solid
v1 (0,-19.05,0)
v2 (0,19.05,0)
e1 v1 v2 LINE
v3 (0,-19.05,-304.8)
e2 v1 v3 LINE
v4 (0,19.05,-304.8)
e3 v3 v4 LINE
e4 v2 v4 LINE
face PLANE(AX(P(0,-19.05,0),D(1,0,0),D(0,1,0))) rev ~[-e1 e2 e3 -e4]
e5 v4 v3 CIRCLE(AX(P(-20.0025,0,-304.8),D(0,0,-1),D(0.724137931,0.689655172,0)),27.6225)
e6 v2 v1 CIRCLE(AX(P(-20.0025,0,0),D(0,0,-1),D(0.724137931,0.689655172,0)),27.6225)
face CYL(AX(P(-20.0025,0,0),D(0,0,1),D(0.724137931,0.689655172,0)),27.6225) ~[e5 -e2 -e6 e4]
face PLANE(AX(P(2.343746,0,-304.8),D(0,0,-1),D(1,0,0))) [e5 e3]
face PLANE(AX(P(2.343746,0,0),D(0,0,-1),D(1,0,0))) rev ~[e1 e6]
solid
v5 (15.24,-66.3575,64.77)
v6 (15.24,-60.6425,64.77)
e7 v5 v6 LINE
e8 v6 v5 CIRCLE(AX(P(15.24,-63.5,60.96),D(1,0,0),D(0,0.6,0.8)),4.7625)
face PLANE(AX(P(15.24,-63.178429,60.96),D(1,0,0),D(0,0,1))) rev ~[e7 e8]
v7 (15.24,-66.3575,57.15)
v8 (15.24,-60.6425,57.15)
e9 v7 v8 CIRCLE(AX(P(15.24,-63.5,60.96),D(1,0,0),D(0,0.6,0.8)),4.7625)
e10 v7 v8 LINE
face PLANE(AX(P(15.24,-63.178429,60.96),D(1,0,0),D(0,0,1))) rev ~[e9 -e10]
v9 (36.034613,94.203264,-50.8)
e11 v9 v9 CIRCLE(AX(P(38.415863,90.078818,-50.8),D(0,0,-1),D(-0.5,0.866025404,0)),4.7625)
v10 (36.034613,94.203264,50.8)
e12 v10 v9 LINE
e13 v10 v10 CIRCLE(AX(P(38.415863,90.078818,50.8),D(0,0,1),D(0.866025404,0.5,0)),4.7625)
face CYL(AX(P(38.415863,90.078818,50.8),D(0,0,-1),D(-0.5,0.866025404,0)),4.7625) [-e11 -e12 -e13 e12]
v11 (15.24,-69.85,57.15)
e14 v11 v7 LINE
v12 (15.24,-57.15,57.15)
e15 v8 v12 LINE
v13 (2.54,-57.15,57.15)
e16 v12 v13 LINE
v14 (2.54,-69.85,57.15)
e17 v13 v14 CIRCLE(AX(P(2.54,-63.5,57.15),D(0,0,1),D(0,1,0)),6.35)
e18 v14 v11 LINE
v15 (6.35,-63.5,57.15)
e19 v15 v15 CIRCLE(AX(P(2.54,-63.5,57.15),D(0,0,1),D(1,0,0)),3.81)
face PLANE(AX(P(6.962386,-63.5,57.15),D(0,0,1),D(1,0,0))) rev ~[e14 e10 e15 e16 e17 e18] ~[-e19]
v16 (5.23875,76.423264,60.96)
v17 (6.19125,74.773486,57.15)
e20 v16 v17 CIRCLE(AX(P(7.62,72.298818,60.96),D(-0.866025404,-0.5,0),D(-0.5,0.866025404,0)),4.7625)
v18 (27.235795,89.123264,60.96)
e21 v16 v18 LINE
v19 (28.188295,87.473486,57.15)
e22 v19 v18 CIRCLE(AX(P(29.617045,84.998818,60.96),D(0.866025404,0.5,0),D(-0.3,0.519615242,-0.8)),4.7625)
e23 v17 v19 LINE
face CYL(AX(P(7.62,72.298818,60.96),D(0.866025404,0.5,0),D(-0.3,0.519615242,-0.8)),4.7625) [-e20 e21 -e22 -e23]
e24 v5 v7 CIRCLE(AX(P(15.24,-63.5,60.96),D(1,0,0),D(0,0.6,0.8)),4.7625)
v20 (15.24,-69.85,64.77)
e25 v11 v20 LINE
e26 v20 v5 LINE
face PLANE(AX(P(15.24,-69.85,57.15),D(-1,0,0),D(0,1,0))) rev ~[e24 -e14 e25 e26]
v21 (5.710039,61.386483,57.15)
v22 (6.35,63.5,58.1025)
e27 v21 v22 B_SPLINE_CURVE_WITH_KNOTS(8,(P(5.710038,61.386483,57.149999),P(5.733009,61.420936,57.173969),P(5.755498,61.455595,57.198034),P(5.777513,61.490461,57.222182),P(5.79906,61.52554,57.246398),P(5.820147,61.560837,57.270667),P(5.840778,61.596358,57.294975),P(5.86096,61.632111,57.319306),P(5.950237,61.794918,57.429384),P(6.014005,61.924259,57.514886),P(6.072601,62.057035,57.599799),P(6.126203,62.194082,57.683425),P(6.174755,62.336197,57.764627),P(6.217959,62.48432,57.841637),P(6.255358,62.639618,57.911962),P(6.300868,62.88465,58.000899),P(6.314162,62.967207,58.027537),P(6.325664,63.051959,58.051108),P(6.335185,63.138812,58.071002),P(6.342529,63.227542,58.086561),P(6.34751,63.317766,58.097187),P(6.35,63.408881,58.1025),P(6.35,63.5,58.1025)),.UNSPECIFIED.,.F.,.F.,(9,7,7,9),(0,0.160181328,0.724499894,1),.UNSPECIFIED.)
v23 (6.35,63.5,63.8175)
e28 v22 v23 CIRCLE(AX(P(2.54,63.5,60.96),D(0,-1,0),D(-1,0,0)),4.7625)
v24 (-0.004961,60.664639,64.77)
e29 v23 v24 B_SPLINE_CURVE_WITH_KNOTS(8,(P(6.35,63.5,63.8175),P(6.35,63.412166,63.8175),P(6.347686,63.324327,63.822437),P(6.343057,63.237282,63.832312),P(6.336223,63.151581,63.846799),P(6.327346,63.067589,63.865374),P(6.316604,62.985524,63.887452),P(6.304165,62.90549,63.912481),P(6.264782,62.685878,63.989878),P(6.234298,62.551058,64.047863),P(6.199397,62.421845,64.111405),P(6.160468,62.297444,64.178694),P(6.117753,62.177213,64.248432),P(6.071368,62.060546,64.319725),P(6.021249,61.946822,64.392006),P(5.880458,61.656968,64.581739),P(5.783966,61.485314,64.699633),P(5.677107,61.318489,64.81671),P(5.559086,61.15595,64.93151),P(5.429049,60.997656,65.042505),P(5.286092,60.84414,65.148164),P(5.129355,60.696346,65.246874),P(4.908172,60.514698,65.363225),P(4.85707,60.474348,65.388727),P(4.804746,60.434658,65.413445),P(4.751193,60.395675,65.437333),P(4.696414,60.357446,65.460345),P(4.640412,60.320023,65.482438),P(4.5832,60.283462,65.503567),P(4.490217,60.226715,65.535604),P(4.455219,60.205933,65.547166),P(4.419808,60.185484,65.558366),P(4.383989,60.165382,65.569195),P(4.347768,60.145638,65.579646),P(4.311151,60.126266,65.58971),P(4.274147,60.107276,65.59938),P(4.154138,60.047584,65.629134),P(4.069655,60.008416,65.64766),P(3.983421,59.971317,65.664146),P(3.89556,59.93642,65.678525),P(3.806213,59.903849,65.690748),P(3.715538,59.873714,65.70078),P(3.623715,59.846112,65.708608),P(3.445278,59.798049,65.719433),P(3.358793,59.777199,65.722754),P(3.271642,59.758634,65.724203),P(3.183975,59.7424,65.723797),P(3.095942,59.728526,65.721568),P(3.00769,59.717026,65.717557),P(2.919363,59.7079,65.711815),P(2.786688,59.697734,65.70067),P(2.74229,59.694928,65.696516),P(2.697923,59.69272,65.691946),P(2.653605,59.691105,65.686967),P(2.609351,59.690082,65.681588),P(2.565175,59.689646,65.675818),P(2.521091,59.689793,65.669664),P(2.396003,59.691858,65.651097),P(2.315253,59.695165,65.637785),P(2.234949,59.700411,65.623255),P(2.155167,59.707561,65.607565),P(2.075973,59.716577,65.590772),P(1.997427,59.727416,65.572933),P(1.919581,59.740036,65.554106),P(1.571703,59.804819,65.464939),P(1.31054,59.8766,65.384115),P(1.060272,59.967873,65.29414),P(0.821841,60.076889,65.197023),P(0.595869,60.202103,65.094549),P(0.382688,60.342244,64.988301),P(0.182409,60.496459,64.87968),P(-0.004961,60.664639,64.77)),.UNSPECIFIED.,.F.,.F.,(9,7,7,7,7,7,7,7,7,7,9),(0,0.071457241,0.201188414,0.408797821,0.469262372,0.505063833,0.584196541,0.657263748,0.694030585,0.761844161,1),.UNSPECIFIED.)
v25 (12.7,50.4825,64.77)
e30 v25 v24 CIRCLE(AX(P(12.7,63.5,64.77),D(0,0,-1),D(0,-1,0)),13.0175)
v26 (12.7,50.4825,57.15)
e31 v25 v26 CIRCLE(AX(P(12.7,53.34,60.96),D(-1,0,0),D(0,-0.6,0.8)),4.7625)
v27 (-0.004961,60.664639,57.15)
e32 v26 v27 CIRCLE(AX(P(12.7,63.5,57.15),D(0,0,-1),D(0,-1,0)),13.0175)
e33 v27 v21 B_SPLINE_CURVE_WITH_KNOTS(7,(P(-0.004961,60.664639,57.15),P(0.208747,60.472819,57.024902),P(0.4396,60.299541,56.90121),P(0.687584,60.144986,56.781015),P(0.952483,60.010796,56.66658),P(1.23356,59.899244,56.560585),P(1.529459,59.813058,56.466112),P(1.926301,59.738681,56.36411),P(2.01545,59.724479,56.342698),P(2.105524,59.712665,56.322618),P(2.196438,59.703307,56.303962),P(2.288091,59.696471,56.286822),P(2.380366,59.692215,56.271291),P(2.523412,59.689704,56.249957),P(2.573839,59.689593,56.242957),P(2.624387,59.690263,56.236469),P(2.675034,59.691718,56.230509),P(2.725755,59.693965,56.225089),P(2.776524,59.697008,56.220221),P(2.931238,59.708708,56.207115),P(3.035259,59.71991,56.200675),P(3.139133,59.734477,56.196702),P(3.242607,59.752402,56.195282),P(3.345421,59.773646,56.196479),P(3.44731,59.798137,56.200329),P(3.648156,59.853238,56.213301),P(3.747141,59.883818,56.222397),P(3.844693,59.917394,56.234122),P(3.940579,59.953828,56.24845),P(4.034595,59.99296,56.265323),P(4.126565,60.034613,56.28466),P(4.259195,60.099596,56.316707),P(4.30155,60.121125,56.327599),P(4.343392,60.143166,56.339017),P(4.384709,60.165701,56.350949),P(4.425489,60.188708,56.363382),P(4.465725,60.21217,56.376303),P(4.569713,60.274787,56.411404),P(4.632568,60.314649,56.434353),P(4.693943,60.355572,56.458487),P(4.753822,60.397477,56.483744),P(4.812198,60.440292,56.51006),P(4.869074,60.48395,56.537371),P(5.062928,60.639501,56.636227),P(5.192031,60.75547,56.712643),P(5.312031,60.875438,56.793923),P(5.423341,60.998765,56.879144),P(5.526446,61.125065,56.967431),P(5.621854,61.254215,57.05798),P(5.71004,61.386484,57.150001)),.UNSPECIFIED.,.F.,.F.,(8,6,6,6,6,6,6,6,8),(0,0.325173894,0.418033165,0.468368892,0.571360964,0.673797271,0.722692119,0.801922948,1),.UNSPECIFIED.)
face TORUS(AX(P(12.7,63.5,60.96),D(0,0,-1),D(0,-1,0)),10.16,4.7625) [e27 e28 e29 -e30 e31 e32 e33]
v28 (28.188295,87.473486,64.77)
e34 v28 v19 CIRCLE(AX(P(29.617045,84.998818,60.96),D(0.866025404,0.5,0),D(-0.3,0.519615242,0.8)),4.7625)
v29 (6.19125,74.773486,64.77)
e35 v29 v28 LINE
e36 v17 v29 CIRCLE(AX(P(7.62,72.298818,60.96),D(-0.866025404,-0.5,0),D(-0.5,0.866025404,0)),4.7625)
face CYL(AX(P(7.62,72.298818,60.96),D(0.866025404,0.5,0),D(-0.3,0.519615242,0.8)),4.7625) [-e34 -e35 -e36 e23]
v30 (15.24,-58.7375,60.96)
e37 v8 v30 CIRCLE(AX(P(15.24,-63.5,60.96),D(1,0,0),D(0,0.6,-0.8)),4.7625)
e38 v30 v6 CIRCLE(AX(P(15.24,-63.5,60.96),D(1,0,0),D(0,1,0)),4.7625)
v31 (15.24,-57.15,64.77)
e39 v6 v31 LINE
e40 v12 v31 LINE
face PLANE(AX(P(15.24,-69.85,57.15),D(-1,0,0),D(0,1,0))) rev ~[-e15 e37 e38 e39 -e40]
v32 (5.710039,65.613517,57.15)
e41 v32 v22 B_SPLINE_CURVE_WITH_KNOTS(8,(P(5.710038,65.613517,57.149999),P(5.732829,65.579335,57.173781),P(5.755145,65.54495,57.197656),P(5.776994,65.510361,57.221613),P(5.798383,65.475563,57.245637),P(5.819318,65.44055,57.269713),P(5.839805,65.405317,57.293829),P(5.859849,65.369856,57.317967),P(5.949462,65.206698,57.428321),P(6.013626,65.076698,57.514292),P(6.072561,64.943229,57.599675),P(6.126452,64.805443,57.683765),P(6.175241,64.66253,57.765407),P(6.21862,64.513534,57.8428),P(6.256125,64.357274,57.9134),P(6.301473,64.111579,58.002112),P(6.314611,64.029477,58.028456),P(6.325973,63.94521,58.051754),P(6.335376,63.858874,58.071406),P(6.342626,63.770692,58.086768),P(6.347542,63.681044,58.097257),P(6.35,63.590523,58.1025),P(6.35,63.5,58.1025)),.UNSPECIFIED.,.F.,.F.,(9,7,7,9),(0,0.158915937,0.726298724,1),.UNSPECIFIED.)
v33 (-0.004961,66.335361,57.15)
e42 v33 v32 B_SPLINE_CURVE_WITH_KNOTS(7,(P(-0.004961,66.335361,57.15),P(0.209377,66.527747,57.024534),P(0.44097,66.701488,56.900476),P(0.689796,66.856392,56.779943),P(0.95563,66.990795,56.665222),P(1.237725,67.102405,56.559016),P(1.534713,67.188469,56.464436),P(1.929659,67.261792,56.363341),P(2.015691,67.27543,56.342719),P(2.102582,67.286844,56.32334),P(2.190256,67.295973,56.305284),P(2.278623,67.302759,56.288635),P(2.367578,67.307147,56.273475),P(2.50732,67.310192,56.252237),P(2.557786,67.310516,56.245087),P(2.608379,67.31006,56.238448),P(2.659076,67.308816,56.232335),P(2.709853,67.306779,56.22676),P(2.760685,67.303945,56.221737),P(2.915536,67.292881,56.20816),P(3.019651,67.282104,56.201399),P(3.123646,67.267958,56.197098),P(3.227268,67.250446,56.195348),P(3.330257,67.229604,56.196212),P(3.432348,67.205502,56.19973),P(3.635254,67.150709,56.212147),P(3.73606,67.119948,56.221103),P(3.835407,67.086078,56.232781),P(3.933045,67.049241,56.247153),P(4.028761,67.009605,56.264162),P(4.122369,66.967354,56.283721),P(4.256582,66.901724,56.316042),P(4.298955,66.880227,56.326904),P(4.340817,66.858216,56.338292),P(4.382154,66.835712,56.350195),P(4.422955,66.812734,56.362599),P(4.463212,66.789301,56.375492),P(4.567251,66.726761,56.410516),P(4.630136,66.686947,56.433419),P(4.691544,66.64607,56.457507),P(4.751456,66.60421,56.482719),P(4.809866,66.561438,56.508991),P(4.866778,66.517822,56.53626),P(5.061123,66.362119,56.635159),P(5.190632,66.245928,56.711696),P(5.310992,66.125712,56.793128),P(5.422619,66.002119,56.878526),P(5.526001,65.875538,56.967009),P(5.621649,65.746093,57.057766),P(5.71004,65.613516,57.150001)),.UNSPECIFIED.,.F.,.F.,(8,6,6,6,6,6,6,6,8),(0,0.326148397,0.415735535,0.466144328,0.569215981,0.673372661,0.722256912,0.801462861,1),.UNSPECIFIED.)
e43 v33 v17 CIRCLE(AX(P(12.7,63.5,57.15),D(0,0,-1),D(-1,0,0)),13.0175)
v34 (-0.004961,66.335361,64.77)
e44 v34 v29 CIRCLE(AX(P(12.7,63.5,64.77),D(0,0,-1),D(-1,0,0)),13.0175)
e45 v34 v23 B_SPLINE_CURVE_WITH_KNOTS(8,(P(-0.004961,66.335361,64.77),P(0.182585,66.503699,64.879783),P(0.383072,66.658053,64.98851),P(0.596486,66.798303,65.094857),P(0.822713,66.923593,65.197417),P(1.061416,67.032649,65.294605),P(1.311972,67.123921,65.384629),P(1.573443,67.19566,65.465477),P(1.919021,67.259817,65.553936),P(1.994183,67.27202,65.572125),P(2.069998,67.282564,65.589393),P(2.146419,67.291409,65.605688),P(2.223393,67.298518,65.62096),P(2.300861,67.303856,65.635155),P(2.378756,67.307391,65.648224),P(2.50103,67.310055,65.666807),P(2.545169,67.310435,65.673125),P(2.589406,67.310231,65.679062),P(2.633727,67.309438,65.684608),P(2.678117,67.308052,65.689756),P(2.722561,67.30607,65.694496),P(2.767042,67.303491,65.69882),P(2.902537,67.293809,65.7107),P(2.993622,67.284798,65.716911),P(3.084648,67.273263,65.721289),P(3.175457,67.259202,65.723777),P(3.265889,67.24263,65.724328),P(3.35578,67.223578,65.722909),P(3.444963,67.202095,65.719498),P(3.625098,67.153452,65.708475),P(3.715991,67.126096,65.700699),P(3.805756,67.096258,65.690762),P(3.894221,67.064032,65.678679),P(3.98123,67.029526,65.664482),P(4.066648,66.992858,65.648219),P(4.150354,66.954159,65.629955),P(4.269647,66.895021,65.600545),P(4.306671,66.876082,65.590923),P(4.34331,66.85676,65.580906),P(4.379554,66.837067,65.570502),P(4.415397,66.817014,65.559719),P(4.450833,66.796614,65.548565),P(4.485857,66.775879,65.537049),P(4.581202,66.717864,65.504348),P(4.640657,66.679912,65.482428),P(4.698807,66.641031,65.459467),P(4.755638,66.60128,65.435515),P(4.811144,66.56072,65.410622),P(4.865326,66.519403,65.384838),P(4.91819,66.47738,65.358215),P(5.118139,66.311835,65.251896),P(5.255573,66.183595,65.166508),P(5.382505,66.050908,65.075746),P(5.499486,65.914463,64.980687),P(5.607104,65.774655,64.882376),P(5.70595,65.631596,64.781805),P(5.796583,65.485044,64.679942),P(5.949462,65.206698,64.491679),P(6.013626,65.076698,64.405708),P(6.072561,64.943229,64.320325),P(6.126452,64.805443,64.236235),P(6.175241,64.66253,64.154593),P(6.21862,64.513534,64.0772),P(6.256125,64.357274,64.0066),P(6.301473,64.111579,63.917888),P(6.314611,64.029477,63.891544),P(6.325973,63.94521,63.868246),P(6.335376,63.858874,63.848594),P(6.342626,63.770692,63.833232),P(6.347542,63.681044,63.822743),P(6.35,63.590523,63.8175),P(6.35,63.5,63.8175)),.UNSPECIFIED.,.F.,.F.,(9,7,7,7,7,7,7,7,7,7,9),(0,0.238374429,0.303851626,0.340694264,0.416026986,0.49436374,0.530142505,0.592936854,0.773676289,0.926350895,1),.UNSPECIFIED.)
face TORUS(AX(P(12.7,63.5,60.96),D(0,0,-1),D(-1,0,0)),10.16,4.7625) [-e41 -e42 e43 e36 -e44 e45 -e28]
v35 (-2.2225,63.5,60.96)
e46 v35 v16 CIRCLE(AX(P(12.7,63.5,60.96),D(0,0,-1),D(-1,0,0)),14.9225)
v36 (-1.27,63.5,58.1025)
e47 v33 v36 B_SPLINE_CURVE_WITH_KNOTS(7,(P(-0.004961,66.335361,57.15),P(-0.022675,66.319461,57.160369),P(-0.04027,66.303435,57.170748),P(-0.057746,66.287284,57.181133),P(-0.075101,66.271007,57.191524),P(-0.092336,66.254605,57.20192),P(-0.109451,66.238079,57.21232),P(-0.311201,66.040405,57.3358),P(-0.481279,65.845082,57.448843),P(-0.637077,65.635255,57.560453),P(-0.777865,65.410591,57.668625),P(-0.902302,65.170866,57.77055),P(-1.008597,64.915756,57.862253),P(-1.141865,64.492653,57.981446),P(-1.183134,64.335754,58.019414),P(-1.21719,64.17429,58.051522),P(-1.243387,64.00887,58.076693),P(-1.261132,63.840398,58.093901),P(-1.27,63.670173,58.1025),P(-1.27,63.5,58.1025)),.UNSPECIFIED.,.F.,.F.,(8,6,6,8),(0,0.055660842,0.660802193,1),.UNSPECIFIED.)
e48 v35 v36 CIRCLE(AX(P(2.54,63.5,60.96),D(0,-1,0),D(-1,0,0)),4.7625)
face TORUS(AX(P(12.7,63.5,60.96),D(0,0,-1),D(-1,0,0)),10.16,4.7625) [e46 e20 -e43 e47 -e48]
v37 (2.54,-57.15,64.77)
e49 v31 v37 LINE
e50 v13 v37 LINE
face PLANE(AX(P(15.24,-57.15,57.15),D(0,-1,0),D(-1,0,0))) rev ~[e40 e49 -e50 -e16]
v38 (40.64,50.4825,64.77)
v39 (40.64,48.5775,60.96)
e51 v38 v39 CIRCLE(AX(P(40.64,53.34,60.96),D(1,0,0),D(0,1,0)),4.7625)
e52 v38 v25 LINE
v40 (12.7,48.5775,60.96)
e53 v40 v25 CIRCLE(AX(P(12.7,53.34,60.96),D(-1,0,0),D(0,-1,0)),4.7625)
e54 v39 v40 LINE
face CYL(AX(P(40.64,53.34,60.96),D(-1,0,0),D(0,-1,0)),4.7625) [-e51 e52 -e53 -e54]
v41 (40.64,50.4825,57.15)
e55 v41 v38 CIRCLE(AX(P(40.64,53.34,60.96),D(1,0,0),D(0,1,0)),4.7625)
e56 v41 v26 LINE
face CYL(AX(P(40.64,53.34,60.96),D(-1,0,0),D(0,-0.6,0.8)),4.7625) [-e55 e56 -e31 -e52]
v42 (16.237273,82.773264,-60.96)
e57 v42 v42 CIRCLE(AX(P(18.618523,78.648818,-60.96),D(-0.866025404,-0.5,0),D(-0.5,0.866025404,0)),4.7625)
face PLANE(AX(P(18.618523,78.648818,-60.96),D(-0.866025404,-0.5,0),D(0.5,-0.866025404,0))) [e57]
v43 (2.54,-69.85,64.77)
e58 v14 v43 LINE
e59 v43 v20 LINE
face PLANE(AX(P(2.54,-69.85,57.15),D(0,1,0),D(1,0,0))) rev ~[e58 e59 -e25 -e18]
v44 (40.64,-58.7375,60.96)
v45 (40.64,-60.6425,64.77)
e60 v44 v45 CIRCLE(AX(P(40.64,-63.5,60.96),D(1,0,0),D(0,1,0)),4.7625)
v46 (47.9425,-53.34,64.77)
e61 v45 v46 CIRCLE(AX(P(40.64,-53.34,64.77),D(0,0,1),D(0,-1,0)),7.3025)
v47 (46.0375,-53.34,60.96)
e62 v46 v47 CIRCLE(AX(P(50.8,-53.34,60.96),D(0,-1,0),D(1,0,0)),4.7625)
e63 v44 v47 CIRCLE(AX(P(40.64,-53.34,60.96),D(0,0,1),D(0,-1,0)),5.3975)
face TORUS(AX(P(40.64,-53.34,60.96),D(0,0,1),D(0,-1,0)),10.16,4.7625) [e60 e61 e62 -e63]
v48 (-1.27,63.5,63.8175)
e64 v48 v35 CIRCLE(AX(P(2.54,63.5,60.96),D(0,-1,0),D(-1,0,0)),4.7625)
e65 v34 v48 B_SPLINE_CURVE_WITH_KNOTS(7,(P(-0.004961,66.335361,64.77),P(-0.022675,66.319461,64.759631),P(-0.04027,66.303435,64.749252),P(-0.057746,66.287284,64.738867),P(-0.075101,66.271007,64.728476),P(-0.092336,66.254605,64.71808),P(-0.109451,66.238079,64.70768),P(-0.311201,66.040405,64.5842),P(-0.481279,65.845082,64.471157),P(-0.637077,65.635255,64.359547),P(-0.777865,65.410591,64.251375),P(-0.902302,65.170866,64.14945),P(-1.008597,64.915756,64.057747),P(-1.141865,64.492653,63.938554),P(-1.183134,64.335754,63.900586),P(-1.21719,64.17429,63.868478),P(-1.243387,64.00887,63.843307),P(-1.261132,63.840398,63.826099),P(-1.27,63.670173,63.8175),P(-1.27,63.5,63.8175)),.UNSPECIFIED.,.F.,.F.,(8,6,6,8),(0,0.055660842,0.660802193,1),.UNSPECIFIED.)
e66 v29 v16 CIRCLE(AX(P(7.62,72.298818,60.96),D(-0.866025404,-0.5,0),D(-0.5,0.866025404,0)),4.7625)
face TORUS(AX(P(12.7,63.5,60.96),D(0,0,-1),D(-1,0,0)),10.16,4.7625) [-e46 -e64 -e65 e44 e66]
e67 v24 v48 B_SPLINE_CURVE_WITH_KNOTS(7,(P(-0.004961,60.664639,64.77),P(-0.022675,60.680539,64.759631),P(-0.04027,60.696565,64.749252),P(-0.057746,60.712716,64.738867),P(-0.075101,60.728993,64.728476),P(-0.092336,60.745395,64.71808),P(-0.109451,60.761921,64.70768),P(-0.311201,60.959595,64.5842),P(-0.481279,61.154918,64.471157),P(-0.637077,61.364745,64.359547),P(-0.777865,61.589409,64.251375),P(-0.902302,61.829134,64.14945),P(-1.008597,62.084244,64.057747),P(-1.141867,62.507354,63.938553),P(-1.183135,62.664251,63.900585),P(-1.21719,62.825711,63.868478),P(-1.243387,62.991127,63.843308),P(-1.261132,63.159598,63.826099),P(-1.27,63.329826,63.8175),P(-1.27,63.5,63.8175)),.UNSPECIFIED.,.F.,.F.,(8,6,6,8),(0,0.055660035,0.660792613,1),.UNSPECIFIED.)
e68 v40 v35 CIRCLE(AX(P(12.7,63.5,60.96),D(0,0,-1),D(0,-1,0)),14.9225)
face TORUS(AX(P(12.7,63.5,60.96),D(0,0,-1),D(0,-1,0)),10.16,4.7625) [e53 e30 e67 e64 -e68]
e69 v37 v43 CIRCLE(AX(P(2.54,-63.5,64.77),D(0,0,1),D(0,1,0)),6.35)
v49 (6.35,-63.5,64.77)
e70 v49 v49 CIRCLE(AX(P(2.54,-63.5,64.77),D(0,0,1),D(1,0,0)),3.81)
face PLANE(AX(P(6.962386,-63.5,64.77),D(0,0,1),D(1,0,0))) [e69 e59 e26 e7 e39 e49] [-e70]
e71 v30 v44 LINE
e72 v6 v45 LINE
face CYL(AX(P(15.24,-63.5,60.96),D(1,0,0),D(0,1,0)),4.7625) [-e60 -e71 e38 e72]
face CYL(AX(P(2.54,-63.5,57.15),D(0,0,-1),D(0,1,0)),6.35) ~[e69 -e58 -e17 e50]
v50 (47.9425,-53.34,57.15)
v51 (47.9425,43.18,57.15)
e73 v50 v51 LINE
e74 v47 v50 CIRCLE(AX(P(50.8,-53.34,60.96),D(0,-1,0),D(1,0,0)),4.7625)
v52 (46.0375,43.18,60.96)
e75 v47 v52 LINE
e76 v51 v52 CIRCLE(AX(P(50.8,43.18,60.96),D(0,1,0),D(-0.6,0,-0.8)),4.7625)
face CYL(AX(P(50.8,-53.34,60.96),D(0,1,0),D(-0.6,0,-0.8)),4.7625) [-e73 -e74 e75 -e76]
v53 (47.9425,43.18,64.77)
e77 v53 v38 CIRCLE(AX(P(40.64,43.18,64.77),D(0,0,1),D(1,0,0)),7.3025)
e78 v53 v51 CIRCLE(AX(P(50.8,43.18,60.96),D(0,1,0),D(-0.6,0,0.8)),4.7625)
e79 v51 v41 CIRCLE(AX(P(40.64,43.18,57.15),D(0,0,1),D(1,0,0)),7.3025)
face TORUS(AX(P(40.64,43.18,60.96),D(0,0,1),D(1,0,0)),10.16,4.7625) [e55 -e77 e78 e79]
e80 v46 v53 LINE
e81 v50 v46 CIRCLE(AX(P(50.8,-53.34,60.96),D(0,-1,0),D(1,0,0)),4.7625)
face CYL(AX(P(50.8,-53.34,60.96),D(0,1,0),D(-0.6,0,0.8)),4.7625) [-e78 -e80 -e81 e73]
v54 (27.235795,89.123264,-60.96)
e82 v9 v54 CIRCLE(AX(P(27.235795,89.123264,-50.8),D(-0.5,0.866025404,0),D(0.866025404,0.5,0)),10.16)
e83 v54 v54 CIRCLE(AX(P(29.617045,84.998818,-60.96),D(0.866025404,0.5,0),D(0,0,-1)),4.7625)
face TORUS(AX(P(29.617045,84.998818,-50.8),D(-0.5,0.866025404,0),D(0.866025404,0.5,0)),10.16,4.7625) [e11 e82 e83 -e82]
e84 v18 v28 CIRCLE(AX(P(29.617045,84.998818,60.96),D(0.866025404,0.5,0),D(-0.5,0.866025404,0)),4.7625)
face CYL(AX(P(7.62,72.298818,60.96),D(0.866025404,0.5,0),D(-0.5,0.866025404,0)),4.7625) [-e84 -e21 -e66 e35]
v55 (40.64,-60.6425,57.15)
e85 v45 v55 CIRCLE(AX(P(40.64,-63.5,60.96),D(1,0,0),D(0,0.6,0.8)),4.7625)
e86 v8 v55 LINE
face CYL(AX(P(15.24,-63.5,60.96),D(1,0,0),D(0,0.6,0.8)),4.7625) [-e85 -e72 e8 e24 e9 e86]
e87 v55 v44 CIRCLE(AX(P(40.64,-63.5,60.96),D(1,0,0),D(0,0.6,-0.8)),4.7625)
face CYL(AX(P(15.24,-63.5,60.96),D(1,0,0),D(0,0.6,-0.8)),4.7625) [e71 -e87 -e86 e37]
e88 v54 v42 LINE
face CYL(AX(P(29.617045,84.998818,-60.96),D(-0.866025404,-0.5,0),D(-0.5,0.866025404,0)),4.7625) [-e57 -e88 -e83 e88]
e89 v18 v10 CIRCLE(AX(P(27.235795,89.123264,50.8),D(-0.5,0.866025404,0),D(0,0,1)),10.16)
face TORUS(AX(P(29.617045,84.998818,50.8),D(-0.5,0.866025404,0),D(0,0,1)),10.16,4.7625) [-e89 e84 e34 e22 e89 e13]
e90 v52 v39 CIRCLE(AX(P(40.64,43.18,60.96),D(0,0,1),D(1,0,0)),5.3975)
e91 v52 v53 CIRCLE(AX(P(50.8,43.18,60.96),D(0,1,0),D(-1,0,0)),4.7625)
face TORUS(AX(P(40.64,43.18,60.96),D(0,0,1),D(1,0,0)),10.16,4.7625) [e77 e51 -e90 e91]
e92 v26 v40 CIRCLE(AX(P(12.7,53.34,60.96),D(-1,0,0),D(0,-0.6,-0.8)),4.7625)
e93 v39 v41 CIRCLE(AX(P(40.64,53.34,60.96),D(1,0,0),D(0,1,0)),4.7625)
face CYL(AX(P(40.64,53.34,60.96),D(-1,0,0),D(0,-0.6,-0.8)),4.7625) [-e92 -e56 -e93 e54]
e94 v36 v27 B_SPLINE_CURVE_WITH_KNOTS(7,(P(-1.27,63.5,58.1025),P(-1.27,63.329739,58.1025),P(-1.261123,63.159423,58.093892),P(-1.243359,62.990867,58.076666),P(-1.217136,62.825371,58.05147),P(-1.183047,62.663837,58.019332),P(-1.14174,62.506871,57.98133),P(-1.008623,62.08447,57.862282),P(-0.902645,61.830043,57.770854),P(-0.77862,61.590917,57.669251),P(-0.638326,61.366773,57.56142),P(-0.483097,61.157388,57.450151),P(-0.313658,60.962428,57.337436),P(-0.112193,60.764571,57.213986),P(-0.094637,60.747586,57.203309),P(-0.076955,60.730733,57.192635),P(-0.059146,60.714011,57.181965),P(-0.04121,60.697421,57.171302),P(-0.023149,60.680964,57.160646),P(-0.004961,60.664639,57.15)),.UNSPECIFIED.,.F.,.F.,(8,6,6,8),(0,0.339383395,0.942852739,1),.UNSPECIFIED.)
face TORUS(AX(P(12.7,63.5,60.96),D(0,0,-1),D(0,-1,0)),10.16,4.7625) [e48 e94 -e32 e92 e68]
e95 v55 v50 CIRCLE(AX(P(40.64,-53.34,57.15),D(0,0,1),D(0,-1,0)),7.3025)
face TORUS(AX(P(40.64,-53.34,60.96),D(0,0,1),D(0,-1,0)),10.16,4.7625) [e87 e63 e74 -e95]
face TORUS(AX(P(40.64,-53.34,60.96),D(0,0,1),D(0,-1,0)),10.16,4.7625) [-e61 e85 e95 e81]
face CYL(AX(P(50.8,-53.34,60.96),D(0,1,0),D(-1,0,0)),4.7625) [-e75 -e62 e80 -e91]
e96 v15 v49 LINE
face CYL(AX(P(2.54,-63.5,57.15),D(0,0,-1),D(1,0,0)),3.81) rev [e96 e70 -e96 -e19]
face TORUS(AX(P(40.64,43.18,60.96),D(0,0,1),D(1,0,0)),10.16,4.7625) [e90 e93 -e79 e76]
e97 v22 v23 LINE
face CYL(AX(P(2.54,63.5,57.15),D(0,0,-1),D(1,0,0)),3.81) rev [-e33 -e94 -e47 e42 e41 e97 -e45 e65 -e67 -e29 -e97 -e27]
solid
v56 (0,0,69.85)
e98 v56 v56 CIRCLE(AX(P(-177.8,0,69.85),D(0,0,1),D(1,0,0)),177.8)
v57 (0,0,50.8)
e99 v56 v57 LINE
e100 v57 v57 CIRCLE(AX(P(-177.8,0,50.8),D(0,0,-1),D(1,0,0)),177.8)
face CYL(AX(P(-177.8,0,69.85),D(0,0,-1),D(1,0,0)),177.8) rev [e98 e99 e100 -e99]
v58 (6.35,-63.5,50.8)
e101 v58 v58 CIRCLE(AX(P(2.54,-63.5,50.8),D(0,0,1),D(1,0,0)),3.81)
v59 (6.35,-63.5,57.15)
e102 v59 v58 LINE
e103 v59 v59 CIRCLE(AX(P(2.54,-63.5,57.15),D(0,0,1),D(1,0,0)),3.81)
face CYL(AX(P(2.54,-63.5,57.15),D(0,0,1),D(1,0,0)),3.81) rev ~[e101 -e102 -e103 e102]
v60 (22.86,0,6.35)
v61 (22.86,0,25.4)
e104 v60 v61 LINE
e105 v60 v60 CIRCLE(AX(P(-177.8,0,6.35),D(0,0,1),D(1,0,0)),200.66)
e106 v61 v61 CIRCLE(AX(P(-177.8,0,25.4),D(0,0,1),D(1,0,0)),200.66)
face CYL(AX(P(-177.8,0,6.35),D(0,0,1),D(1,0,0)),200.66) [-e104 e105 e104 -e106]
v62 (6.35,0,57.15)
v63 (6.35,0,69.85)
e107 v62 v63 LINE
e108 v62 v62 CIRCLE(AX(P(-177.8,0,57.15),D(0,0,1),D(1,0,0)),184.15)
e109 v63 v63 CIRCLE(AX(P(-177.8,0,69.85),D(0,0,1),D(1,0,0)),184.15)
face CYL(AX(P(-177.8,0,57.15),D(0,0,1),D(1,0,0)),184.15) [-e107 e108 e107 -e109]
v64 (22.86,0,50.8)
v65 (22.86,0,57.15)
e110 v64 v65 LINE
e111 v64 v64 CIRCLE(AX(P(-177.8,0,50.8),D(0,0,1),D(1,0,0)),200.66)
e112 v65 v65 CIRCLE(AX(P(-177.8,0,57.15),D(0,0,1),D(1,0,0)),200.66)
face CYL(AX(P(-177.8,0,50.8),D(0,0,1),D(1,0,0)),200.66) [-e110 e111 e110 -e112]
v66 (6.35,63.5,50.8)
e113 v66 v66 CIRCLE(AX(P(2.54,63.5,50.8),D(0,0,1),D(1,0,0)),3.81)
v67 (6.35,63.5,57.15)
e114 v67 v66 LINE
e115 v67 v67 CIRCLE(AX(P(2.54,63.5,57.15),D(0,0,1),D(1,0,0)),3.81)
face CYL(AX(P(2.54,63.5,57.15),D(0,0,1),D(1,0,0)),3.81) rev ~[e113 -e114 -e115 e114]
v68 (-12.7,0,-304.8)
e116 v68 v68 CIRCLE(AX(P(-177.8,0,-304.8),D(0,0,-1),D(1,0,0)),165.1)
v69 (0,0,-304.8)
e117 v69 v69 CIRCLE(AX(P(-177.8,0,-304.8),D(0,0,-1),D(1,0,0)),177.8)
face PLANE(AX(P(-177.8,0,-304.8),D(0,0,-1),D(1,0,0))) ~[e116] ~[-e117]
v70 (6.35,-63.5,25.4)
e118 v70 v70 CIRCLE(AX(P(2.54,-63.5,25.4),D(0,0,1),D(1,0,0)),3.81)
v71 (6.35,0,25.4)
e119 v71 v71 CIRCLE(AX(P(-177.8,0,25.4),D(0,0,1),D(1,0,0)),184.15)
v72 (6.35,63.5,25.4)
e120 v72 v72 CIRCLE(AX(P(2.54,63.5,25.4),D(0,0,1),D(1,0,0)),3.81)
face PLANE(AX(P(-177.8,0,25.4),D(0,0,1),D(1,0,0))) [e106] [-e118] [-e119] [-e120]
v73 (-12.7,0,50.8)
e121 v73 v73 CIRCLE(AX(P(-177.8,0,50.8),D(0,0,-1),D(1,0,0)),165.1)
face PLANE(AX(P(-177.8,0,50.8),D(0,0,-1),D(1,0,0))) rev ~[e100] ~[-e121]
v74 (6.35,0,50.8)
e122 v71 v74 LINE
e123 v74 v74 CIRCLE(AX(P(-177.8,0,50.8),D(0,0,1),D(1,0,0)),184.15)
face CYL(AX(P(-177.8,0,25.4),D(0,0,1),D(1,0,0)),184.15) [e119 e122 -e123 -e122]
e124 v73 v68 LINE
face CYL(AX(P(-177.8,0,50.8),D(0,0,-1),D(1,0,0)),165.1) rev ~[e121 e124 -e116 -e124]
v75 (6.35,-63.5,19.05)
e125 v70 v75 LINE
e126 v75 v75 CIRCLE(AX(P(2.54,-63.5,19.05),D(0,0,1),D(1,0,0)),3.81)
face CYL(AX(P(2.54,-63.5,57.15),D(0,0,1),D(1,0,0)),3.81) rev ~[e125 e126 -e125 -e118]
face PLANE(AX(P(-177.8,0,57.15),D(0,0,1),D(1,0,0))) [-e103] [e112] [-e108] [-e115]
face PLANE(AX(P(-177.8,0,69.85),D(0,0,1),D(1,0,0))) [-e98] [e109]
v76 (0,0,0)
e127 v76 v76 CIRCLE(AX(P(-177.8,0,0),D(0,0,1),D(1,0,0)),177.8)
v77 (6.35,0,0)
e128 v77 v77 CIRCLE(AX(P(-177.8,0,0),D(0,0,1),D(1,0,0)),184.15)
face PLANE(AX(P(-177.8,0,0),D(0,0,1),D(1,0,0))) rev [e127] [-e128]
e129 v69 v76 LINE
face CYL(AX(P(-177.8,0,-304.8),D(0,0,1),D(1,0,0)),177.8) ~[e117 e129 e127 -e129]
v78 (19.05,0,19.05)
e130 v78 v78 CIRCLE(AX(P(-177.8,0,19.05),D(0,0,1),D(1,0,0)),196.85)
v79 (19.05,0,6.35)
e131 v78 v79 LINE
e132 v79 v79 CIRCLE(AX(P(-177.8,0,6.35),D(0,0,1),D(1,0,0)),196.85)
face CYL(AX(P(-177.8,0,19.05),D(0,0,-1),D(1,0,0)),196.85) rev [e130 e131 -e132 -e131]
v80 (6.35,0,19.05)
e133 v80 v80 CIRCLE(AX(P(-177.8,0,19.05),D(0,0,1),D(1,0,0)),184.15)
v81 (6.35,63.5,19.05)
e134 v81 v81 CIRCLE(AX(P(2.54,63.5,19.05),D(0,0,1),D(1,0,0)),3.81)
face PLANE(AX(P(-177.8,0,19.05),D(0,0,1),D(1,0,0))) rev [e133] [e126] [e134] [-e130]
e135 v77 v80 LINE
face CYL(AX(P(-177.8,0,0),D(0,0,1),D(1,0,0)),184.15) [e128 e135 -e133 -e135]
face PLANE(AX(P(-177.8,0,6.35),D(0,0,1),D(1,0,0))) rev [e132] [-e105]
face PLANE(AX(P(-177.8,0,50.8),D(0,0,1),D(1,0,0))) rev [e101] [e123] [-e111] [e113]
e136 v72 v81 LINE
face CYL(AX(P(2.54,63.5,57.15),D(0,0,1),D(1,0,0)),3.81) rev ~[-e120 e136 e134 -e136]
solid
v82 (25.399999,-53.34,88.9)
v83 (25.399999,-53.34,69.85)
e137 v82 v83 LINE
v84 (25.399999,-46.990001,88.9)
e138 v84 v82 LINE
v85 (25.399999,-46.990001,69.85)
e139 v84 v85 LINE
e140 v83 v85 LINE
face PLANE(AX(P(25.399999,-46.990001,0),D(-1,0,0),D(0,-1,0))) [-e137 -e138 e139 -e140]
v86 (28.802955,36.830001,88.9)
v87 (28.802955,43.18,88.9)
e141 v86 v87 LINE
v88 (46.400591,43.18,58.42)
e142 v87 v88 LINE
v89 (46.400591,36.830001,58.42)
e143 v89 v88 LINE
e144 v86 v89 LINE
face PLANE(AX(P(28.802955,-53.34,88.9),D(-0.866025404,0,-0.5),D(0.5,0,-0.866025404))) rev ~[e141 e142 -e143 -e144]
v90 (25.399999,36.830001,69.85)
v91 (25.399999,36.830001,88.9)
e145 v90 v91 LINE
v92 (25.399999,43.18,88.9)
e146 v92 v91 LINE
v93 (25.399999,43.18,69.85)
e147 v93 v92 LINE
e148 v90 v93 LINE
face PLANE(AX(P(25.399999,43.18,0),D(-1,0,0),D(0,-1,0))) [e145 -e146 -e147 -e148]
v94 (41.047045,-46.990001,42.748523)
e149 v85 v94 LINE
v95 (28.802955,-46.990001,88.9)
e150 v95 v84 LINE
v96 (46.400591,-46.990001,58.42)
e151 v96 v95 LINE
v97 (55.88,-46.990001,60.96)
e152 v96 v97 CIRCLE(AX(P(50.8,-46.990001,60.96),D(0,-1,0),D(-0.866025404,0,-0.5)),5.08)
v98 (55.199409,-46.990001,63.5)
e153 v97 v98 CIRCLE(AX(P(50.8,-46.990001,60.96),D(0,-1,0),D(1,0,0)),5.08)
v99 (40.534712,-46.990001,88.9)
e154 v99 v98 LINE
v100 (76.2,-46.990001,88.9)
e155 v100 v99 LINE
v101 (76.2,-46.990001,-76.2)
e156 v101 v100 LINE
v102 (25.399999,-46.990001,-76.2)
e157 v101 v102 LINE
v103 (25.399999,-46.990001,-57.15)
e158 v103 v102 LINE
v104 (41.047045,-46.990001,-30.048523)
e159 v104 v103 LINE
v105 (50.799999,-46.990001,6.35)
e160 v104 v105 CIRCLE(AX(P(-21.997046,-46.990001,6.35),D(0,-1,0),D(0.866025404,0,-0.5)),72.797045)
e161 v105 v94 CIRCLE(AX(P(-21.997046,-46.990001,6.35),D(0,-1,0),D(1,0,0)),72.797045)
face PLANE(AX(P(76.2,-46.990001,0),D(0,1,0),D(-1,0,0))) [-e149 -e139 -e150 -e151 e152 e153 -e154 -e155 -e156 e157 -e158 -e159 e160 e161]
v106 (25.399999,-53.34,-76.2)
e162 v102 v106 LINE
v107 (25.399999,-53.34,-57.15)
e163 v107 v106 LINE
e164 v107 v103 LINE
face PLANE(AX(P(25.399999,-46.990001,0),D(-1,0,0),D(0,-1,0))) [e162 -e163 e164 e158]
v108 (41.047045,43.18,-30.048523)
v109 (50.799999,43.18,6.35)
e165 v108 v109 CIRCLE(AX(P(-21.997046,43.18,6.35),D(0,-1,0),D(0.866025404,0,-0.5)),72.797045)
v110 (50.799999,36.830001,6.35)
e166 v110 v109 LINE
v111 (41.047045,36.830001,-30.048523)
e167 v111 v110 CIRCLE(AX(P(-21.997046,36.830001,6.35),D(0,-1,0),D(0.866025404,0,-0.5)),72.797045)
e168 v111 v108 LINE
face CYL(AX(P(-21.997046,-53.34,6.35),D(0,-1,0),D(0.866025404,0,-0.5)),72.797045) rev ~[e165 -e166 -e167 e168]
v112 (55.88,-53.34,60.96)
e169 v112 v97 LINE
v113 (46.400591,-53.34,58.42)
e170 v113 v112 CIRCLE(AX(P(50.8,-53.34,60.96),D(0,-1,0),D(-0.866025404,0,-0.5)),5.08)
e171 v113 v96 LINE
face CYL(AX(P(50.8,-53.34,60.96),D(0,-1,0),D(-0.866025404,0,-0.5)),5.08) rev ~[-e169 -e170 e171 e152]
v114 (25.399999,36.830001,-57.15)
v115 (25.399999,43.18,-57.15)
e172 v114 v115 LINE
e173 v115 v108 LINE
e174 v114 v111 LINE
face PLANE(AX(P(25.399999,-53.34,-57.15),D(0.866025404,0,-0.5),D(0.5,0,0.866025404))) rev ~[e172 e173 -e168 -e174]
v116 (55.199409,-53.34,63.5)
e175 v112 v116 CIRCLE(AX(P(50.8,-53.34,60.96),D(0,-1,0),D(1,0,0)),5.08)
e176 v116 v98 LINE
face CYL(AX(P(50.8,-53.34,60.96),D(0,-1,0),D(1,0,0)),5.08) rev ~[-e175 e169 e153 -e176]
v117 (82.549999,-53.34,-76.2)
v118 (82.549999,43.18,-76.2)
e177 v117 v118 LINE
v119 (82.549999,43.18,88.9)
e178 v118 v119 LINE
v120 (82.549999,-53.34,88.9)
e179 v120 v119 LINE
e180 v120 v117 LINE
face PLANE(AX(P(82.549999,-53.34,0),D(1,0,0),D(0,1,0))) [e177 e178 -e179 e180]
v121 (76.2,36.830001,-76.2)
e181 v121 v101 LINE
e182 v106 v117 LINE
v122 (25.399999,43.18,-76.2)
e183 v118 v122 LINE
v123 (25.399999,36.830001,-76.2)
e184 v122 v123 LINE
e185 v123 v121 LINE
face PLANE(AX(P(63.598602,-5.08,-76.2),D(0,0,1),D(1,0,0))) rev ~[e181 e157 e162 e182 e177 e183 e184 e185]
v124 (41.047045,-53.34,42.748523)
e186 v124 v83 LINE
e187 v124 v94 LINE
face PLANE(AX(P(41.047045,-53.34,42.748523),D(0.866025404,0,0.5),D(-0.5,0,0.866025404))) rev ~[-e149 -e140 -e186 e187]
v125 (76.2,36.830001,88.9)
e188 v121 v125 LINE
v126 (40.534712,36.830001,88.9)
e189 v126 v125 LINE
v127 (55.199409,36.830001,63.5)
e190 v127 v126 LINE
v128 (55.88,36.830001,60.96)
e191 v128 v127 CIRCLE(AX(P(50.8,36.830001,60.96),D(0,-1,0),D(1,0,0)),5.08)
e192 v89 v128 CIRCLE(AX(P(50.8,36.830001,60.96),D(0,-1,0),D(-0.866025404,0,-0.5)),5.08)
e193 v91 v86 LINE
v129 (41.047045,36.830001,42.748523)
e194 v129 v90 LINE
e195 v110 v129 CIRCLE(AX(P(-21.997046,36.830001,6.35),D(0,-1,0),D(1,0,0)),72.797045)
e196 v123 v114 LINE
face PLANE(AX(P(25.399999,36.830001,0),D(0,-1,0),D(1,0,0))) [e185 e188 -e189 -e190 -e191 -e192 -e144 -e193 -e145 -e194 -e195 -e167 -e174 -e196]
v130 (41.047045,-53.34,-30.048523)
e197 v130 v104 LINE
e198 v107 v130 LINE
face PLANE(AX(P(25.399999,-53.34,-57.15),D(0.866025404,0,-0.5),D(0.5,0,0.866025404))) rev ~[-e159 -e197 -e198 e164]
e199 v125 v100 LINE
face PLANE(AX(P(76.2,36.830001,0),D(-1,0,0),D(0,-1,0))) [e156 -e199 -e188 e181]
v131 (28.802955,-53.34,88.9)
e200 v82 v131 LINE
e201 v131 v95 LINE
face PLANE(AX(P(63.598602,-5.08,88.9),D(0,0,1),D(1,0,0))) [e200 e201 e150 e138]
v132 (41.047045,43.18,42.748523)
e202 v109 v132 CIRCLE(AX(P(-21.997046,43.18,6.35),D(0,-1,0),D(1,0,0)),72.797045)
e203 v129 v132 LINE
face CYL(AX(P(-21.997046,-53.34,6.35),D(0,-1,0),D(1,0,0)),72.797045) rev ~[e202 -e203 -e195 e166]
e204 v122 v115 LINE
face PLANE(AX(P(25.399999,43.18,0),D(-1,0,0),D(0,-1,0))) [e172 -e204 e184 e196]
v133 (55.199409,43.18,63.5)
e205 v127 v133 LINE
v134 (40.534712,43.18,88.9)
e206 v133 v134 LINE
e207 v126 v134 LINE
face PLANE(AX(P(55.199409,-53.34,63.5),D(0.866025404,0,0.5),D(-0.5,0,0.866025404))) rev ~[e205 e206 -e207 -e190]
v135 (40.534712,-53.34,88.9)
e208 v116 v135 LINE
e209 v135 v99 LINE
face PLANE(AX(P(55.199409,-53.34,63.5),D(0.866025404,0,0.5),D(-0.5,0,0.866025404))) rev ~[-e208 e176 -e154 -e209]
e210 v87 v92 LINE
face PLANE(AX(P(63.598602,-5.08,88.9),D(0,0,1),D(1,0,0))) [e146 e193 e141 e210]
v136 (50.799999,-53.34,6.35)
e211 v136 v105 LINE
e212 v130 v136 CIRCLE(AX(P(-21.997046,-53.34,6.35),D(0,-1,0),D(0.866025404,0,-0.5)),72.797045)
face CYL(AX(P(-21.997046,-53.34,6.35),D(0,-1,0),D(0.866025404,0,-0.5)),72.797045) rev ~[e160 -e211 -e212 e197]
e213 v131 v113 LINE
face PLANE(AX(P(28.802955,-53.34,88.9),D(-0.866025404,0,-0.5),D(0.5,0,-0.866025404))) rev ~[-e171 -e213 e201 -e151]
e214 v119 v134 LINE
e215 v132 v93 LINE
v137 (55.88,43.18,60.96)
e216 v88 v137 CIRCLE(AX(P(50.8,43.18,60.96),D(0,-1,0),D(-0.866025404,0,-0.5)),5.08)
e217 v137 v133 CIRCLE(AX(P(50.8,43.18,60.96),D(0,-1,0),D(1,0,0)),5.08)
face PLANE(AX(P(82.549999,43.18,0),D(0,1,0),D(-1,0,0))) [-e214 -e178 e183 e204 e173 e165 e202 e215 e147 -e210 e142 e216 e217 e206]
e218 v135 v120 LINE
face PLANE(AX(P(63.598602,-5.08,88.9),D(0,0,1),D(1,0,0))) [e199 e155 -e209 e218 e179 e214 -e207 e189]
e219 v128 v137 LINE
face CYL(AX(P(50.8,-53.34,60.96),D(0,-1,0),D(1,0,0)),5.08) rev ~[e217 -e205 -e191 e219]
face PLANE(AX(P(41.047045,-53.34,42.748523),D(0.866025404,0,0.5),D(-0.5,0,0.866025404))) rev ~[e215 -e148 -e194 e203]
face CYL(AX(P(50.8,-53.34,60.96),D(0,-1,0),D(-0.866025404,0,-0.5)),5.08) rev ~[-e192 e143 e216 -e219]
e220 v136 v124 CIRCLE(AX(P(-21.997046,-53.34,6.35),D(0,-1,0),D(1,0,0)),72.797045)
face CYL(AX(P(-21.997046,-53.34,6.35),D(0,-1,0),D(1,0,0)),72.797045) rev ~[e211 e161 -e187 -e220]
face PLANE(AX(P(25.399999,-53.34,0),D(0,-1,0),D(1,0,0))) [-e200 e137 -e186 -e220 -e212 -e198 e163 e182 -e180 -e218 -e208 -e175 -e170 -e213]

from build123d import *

# Parameters (mm, degrees)
F2_R           = 3.81
F3_DEPTH       = 57.151
F4_R           = 3.81
F5_DEPTH       = 7.62
F11_R          = 4.7625
F15_R          = 3.81
F16_DEPTH      = 122.8735001
F16_DEPTH_BACK = 12.701
F20_DEPTH      = 304.8
F22_DEPTH      = 88.9
F22_DEPTH_BACK = 76.2
F24_DEPTH      = 96.52


with BuildPart() as f1:
    # F0 (on Front) → F1 (revolve)
    with BuildSketch(Plane.XZ):
        Polygon((0, 25.4), (0, 0), (6.35, 0), (6.35, 19.05), (19.05, 19.05), (19.05, 6.35), (22.86, 6.35), (22.86, 25.4), (6.35, 25.4), (6.35, 50.8), (22.86, 50.8), (22.86, 57.15), (6.35, 57.15), (6.35, 69.85), (0, 69.85), (0, 50.8), align=None)
    revolve(axis=Axis((-177.8, 0, 29.9224383198), (0, 0, 1)))

    # F2 (on face) → F3 (cut, through all)
    with BuildSketch(Plane.XY.offset(57.15)):
        with Locations((2.54, -63.5)):
            Circle(F2_R)
        with Locations((2.54, 63.5)):
            Circle(F2_R)
    extrude(amount=-F3_DEPTH, mode=Mode.SUBTRACT)

    # F17 (on Front) → F18 (revolve)
    with BuildSketch(Plane.XZ):
        Polygon((0, -304.8), (0, 0), (0, 50.8), (-12.7, 50.8), (-12.7, -304.8), align=None)
    revolve(axis=Axis((-177.8, 0, 69.85), (0, 0, -1)))


with BuildPart() as f5:
    # F4 (on face) → F5 (new body)
    with BuildSketch(Plane.XY.offset(57.15)):
        with BuildLine():
            Line((15.24, -69.85), (15.24, -57.15))
            Line((15.24, -57.15), (2.54, -57.15))
            ThreePointArc((2.54, -57.15), (-3.81, -63.5), (2.54, -69.85))
            Line((2.54, -69.85), (15.24, -69.85))
        make_face()
        with Locations((2.54, -63.5)):
            Circle(F4_R, mode=Mode.SUBTRACT)
    extrude(amount=F5_DEPTH)

    # F10: sweep along a path in F9
    with BuildLine(Plane.XY.offset(60.96)) as f10_path:
        Line((15.24, -63.5), (40.64, -63.5))
        ThreePointArc((40.64, -63.5), (47.8242048969, -60.5242048969), (50.8, -53.34))
        Line((50.8, -53.34), (50.8, 43.18))
        ThreePointArc((50.8, 43.18), (47.8242048969, 50.3642048969), (40.64, 53.34))
        Line((40.64, 53.34), (12.7, 53.34))
        ThreePointArc((12.7, 53.34), (5.5157951031, 56.3157951031), (2.54, 63.5))
        ThreePointArc((2.54, 63.5), (3.9011818976, 68.58), (7.62, 72.2988181024))
        Line((7.62, 72.2988181024), (29.6170452561, 84.9988181024))
    # F6 (on face) → F10 (sweep)
    with BuildSketch(Plane.YZ.offset(15.24)):
        with BuildLine():
            Line((-66.3575, 64.77), (-60.6425, 64.77))
            ThreePointArc((-60.6425, 64.77), (-63.5, 65.7225), (-66.3575, 64.77))
        make_face()
        with BuildLine():
            ThreePointArc((-60.6425, 57.15), (-59.2402905029, 58.8301452514), (-58.7375, 60.96))
            ThreePointArc((-58.7375, 60.96), (-59.2402905029, 63.0898547486), (-60.6425, 64.77))
            Line((-60.6425, 64.77), (-66.3575, 64.77))
            ThreePointArc((-66.3575, 64.77), (-68.2625, 60.96), (-66.3575, 57.15))
            Line((-66.3575, 57.15), (-60.6425, 57.15))
        make_face()
        with BuildLine():
            ThreePointArc((-66.3575, 57.15), (-63.5, 56.1975), (-60.6425, 57.15))
            Line((-60.6425, 57.15), (-66.3575, 57.15))
        make_face()
    sweep(path=f10_path.line)

    # F14: sweep along a path in F13
    with BuildLine(Plane(origin=(-29.4013065702, 50.9245567884, 0), x_dir=(0.8660254038, 0.5, 0), z_dir=(0.5, -0.8660254038, 0))) as f14_path:
        ThreePointArc((68.1485226281, 60.96), (75.3327275249, 57.9842048969), (78.3085226281, 50.8))
        Line((78.3085226281, 50.8), (78.3085226281, -50.8))
        ThreePointArc((78.3085226281, -50.8), (75.3327275249, -57.9842048969), (68.1485226281, -60.96))
        Line((68.1485226281, -60.96), (55.4485226281, -60.96))
    # F11 (on face) → F14 (sweep)
    with BuildSketch(Plane(origin=(59.0183518263, 34.074261314, 0), x_dir=(-0.5, 0.8660254038, 0), z_dir=(0.8660254038, 0.5, 0))):
        with Locations((58.8026131403, 60.96)):
            Circle(F11_R)
    sweep(path=f14_path.line)

    # F15 (on face) → F16 (cut, two sides)
    with BuildSketch(Plane.XY.offset(57.15)) as f16_sk:
        with Locations((2.54, 63.5)):
            Circle(F15_R)
    extrude(amount=-F16_DEPTH, mode=Mode.SUBTRACT)
    extrude(f16_sk.sketch, amount=F16_DEPTH_BACK, mode=Mode.SUBTRACT)


with BuildPart() as f20:
    # F19 (on face) → F20 (new body, through all)
    with BuildSketch(Plane(origin=(0, 0, 0), x_dir=(1, 0, 0), z_dir=(0, 0, -1))):
        with BuildLine():
            Line((0, 19.05), (0, 0))
            Line((0, 0), (0, -19.05))
            ThreePointArc((0, -19.05), (7.62, 0), (0, 19.05))
        make_face()
    extrude(amount=F20_DEPTH)


with BuildPart() as f22:
    # F21 (on Top) → F22 (new body, two sides)
    with BuildSketch(Plane.XY) as f22_sk:
        Polygon((82.5499994576, -53.34), (82.5499994576, -5.08), (82.5499994576, 43.18), (25.3999994576, 43.18), (25.3999994576, 36.8300005424), (76.2, 36.8300005424), (76.2, -5.08), (76.2, -46.9900005424), (25.3999994576, -46.9900005424), (25.3999994576, -53.34), align=None)
    extrude(amount=F22_DEPTH)
    extrude(f22_sk.sketch, amount=-F22_DEPTH_BACK)

    # F23 (on face) → F24 (cut, through all)
    with BuildSketch(Plane.XZ.offset(53.34)):
        with BuildLine():
            ThreePointArc((46.4005909488, 58.42), (52.1148007491, 56.0530968025), (55.88, 60.96))
            ThreePointArc((55.88, 60.96), (55.7069031975, 62.2748007491), (55.1994090512, 63.5))
            ThreePointArc((55.1994090512, 63.5), (48.26, 65.3594090512), (46.4005909488, 58.42))
        make_face()
        with BuildLine():
            ThreePointArc((46.4005909488, 58.42), (48.26, 65.3594090512), (55.1994090512, 63.5))
            Line((55.1994090512, 63.5), (40.5347122138, 88.9))
            Line((40.5347122138, 88.9), (28.8029547439, 88.9))
            Line((28.8029547439, 88.9), (46.4005909488, 58.42))
        make_face()
        with BuildLine():
            Line((41.0470447137, 42.7485226281), (25.3999994576, 69.85))
            Line((25.3999994576, 69.85), (25.3999994576, -57.15))
            Line((25.3999994576, -57.15), (41.0470447137, -30.0485226281))
            ThreePointArc((41.0470447137, -30.0485226281), (48.3195002919, -12.4912617395), (50.7999994576, 6.35))
            ThreePointArc((50.7999994576, 6.35), (48.3195002919, 25.1912617395), (41.0470447137, 42.7485226281))
        make_face()
    extrude(amount=-F24_DEPTH, mode=Mode.SUBTRACT)


solid = Compound([f1.part, f5.part, f20.part, f22.part])
